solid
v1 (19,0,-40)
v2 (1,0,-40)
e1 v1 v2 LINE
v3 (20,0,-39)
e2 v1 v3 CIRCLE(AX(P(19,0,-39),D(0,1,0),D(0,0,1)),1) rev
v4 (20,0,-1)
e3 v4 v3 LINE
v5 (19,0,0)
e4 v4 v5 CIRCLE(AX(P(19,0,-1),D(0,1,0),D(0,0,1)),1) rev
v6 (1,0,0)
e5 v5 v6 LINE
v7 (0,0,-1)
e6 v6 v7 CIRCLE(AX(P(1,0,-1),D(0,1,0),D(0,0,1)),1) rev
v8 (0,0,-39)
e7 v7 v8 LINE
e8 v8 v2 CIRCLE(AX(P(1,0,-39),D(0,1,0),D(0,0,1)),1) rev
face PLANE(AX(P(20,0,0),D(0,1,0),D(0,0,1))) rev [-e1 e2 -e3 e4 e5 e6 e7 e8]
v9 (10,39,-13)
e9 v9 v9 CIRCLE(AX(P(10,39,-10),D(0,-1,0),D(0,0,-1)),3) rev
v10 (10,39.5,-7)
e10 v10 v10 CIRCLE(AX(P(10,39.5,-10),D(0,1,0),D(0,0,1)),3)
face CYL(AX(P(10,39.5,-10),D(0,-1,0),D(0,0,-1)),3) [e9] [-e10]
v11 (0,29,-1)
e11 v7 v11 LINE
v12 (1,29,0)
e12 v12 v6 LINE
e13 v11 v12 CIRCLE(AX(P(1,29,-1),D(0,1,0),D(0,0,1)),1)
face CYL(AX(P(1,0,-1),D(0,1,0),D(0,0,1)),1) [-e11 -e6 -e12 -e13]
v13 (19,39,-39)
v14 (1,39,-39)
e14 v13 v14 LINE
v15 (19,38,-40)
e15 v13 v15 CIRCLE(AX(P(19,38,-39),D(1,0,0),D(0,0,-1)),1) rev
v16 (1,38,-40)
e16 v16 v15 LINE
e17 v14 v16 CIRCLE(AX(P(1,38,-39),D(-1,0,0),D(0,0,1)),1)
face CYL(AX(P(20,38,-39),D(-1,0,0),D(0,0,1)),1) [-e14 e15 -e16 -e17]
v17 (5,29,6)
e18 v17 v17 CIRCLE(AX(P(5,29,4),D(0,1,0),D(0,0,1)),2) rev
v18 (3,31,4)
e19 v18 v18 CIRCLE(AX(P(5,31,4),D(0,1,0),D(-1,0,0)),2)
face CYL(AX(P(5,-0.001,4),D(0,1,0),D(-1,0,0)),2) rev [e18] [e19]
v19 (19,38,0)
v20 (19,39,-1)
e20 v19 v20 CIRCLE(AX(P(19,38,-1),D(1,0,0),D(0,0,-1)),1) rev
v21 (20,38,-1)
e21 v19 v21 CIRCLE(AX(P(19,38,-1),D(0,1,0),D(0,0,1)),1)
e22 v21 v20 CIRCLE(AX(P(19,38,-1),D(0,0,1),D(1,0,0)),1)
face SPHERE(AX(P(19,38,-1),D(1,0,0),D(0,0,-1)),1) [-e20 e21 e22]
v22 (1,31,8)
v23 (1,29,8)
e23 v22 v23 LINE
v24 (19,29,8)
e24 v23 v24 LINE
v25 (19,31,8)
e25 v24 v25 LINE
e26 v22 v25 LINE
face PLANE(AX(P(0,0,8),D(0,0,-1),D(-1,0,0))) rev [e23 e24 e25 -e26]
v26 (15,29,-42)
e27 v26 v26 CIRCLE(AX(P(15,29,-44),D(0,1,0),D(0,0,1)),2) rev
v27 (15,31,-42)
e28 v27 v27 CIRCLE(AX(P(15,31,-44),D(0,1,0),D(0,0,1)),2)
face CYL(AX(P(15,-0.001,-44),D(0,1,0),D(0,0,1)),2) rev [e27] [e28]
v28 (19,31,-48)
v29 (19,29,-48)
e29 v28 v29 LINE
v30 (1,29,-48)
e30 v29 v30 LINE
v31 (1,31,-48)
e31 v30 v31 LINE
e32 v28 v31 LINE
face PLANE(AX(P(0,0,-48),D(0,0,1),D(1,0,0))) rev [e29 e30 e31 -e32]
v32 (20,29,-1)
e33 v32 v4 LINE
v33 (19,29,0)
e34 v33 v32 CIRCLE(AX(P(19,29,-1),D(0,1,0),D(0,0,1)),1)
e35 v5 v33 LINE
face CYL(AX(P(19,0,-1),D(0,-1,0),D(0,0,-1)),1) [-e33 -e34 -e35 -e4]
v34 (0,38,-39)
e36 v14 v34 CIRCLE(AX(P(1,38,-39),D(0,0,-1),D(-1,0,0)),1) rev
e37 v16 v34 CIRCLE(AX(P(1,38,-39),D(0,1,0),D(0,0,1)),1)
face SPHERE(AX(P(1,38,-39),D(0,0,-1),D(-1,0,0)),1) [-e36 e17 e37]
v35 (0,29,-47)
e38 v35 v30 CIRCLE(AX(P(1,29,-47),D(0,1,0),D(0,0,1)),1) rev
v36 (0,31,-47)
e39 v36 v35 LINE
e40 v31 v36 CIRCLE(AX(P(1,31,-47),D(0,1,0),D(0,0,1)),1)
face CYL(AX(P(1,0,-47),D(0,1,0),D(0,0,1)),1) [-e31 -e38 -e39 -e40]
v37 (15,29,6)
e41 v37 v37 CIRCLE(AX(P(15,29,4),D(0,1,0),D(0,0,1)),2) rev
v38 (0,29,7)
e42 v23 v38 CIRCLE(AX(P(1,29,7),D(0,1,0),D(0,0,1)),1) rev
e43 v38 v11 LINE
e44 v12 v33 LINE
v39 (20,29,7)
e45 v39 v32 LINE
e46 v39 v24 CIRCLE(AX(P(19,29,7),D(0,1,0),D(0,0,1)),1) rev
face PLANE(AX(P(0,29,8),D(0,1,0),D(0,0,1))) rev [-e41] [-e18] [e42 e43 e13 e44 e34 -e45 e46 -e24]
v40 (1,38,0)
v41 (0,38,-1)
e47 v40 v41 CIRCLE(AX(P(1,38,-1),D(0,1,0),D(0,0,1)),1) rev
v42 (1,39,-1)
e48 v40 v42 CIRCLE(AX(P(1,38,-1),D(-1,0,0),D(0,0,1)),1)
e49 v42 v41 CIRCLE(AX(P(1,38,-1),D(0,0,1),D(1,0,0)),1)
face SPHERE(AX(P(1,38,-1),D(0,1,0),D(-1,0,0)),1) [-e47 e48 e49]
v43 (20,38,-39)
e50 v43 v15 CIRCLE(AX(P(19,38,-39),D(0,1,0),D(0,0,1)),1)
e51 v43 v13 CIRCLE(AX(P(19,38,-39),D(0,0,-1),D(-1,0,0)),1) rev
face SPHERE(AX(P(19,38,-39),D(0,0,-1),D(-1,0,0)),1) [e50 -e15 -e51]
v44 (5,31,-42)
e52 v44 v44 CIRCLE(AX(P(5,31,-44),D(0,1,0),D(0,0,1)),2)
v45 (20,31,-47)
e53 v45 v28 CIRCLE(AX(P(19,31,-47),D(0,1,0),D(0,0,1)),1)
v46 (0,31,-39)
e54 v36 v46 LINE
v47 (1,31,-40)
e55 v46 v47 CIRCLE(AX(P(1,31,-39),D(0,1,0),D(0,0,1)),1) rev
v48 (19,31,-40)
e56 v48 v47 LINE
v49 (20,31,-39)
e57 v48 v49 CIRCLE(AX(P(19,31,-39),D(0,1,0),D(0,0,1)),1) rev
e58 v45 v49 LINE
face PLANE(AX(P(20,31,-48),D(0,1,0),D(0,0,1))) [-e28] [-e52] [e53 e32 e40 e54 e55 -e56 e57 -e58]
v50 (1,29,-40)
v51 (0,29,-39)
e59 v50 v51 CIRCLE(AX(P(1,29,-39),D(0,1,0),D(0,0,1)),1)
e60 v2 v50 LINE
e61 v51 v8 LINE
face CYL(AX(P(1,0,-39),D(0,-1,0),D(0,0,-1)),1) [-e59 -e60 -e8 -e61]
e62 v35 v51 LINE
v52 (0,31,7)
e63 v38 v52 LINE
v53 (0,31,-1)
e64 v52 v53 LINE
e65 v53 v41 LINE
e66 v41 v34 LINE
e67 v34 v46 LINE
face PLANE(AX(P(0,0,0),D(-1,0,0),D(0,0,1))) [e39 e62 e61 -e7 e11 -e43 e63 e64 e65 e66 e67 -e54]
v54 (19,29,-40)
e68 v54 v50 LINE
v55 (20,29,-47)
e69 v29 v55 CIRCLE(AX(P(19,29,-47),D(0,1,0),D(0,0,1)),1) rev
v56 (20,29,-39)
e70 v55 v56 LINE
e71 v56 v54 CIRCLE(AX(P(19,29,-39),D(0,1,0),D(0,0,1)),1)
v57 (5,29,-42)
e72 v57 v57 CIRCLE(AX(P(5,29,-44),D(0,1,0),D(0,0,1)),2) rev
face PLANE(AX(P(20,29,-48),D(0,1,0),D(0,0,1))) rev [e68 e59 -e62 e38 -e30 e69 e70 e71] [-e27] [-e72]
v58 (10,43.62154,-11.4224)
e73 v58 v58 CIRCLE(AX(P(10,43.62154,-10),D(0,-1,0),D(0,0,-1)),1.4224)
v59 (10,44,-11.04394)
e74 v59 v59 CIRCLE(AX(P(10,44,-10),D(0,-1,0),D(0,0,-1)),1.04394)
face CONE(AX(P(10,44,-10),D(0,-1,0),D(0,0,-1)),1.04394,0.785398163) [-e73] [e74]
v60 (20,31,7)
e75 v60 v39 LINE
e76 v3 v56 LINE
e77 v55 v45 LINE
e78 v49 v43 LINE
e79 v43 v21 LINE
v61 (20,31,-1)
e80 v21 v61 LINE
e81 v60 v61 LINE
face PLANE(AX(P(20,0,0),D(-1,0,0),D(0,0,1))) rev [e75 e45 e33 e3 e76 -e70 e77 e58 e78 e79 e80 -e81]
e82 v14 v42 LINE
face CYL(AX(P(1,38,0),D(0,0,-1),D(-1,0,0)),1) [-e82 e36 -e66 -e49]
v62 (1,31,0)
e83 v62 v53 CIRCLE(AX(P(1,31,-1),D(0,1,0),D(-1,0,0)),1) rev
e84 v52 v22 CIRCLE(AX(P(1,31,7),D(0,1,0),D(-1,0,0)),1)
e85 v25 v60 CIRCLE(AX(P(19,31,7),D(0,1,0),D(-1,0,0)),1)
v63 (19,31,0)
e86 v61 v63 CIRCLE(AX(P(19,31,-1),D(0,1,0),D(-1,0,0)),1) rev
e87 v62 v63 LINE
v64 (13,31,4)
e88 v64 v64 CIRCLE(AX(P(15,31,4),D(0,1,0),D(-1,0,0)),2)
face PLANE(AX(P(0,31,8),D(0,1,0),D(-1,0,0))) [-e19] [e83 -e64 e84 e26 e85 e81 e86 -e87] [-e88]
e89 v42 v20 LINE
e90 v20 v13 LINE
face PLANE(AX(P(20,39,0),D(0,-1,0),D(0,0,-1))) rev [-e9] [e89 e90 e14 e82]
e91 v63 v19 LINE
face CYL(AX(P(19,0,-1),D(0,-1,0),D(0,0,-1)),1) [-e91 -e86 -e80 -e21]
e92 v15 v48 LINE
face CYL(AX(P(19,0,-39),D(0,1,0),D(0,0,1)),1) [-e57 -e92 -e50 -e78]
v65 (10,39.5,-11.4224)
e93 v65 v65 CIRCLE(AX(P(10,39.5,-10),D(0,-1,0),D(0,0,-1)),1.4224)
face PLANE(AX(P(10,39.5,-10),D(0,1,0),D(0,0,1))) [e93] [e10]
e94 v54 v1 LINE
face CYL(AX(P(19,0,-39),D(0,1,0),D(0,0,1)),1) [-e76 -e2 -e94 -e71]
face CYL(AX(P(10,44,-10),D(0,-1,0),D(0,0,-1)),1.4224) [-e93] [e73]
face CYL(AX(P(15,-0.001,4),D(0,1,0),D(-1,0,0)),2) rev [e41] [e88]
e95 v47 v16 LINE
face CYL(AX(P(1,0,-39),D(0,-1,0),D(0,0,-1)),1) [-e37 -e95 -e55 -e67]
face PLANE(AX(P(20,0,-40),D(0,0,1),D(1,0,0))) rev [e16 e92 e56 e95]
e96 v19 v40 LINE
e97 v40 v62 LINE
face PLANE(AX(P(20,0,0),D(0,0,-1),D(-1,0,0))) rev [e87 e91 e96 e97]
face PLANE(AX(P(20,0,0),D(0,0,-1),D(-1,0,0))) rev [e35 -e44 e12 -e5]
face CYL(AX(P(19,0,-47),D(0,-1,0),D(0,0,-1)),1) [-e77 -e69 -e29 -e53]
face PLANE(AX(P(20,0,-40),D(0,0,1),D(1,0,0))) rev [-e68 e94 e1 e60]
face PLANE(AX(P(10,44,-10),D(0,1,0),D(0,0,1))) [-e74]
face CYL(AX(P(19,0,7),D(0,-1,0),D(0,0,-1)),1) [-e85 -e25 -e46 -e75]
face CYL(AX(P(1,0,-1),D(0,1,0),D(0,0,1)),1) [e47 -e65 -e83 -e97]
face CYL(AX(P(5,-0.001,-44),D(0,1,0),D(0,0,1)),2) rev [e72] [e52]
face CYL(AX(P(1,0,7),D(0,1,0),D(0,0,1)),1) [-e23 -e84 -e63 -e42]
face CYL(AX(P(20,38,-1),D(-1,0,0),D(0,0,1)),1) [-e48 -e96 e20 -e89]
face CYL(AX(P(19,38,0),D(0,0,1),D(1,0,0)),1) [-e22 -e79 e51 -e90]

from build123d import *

# Parameters (mm, degrees)
SKETCH_1_W          = 40
SKETCH_1_H          = 39
EXTRUDE_1_DEPTH     = 20
SKETCH_2_W          = 20
SKETCH_2_H          = 2
EXTRUDE_2_DEPTH     = 8
SKETCH_3_W          = 20
SKETCH_3_H          = 2
EXTRUDE_3_DEPTH     = 8
CUT_EXTRUDE_3_REACH = 62.539
SKETCH_4_R          = 2
CUT_EXTRUDE_5_REACH = 62.539
SKETCH_5_R          = 2
SKETCH_7_R          = 3
EXTRUDE_5_DEPTH     = 0.5
SKETCH_9_R          = 1.5
EXTRUDE_6_DEPTH     = 5
FILLET_7_R          = 1
FILLET_8_R          = 1
FILLET_9_R          = 1
FILLET_10_R         = 1


# Read off the part's stored shape, not the designer's step: #4-40 机械螺纹 螺柱3
with BuildPart() as part:
    # 草图1 → 凸台-拉伸1 (new body)
    with BuildSketch(Plane(origin=(0, 0, 0), x_dir=(0, 0, -1), z_dir=(1, 0, 0))):
        with Locations((20, 19.5)):
            Rectangle(SKETCH_1_W, SKETCH_1_H)
    extrude(amount=EXTRUDE_1_DEPTH)

    # 草图2 → 凸台-拉伸2 (add)
    with BuildSketch(Plane.XY):
        with Locations((10, 30)):
            Rectangle(SKETCH_2_W, SKETCH_2_H)
    extrude(amount=EXTRUDE_2_DEPTH)

    # 草图3 → 凸台-拉伸3 (add)
    with BuildSketch(Plane(origin=(0, 0, -40), x_dir=(-1, 0, 0), z_dir=(0, 0, -1))):
        with Locations((-10, 30)):
            Rectangle(SKETCH_3_W, SKETCH_3_H)
    extrude(amount=EXTRUDE_3_DEPTH)

    # 草图4 → 切除-拉伸3 (cut, up to next)
    with BuildSketch(Plane(origin=(0, 31, 0), x_dir=(1, 0, 0), z_dir=(0, 1, 0)), mode=Mode.PRIVATE) as cut_extrude_3_sk1:
        with Locations(Location((5, -4, 0), (0, 0, 180))):
            Circle(SKETCH_4_R)
    cut_extrude_3_tool1 = extrude(cut_extrude_3_sk1.sketch, amount=-CUT_EXTRUDE_3_REACH, mode=Mode.PRIVATE) & part.part
    # 草图4 → 切除-拉伸3 (cut, up to next)
    with BuildSketch(Plane(origin=(0, 31, 0), x_dir=(1, 0, 0), z_dir=(0, 1, 0)), mode=Mode.PRIVATE) as cut_extrude_3_sk2:
        with Locations(Location((15, -4, 0), (0, 0, 180))):
            Circle(SKETCH_4_R)
    cut_extrude_3_tool2 = extrude(cut_extrude_3_sk2.sketch, amount=-CUT_EXTRUDE_3_REACH, mode=Mode.PRIVATE) & part.part
    add(cut_extrude_3_tool1.solids().sort_by_distance((5, 31, 4))[0], mode=Mode.SUBTRACT)
    add(cut_extrude_3_tool2.solids().sort_by_distance((15, 31, 4))[0], mode=Mode.SUBTRACT)

    # 草图5 → 切除-拉伸5 (cut, up to next)
    with BuildSketch(Plane(origin=(0, 31, 0), x_dir=(1, 0, 0), z_dir=(0, 1, 0)), mode=Mode.PRIVATE) as cut_extrude_5_sk1:
        with Locations(Location((5, 44, 0), (0, 0, 270))):
            Circle(SKETCH_5_R)
    cut_extrude_5_tool1 = extrude(cut_extrude_5_sk1.sketch, amount=-CUT_EXTRUDE_5_REACH, mode=Mode.PRIVATE) & part.part
    # 草图5 → 切除-拉伸5 (cut, up to next)
    with BuildSketch(Plane(origin=(0, 31, 0), x_dir=(1, 0, 0), z_dir=(0, 1, 0)), mode=Mode.PRIVATE) as cut_extrude_5_sk2:
        with Locations(Location((15, 44, 0), (0, 0, 270))):
            Circle(SKETCH_5_R)
    cut_extrude_5_tool2 = extrude(cut_extrude_5_sk2.sketch, amount=-CUT_EXTRUDE_5_REACH, mode=Mode.PRIVATE) & part.part
    add(cut_extrude_5_tool1.solids().sort_by_distance((5, 31, -44))[0], mode=Mode.SUBTRACT)
    add(cut_extrude_5_tool2.solids().sort_by_distance((15, 31, -44))[0], mode=Mode.SUBTRACT)

    # 草图7 → 凸台-拉伸5 (add)
    with BuildSketch(Plane(origin=(0, 39, 0), x_dir=(1, 0, 0), z_dir=(0, 1, 0))):
        with Locations(Location((10, 10, 0), (0, 0, 90))):
            Circle(SKETCH_7_R)
    extrude(amount=EXTRUDE_5_DEPTH)

    # 草图9 → 凸台-拉伸6 (add)
    with BuildSketch(Plane(origin=(0, 39, 0), x_dir=(1, 0, 0), z_dir=(0, 1, 0))):
        with Locations(Location((10, 10, 0), (0, 0, 270))):
            Circle(SKETCH_9_R)
    extrude(amount=EXTRUDE_6_DEPTH)

    # 圆角7
    fillet_7_edges = [part.edges().sort_by_distance(p)[0] for p in [
        (20, 39, -20),
        (0, 35, -40),
        (20, 35, -40),
        (20, 35, 0),
        (0, 39, -20),
        (0, 35, 0),
        (10, 39, 0),
        (10, 39, -40),
    ]]
    fillet(fillet_7_edges, radius=FILLET_7_R)

    # 圆角8
    fillet_8_edges = [part.edges().sort_by_distance(p)[0] for p in [
        (20, 30, 8),
        (0, 30, 8),
    ]]
    fillet(fillet_8_edges, radius=FILLET_8_R)

    # 圆角9
    fillet_9_edges = [part.edges().sort_by_distance(p)[0] for p in [
        (0, 30, -48),
        (20, 30, -48),
    ]]
    fillet(fillet_9_edges, radius=FILLET_9_R)

    # #4-40 机械螺纹 螺柱3 outline → #4-40 机械螺纹 螺柱3 (revolve, cut)
    with BuildSketch(Plane(origin=(10, 0, -10), x_dir=(1, 0, 0), z_dir=(0, 0, 1))):
        Polygon((1.5, 44), (1.04394, 44), (1.4224, 43.62154), (1.4224, 39.5), (1.5, 39.5), align=None)
    revolve(axis=Axis((10, 0, -10), (0, 1, 0)), mode=Mode.SUBTRACT)

    # 圆角10
    fillet_10_edges = [part.edges().sort_by_distance(p)[0] for p in [
        (20, 14.5, -40),
        (0, 14.5, 0),
        (20, 14.5, 0),
        (0, 14.5, -40),
    ]]
    fillet(fillet_10_edges, radius=FILLET_10_R)


solid = part.part
